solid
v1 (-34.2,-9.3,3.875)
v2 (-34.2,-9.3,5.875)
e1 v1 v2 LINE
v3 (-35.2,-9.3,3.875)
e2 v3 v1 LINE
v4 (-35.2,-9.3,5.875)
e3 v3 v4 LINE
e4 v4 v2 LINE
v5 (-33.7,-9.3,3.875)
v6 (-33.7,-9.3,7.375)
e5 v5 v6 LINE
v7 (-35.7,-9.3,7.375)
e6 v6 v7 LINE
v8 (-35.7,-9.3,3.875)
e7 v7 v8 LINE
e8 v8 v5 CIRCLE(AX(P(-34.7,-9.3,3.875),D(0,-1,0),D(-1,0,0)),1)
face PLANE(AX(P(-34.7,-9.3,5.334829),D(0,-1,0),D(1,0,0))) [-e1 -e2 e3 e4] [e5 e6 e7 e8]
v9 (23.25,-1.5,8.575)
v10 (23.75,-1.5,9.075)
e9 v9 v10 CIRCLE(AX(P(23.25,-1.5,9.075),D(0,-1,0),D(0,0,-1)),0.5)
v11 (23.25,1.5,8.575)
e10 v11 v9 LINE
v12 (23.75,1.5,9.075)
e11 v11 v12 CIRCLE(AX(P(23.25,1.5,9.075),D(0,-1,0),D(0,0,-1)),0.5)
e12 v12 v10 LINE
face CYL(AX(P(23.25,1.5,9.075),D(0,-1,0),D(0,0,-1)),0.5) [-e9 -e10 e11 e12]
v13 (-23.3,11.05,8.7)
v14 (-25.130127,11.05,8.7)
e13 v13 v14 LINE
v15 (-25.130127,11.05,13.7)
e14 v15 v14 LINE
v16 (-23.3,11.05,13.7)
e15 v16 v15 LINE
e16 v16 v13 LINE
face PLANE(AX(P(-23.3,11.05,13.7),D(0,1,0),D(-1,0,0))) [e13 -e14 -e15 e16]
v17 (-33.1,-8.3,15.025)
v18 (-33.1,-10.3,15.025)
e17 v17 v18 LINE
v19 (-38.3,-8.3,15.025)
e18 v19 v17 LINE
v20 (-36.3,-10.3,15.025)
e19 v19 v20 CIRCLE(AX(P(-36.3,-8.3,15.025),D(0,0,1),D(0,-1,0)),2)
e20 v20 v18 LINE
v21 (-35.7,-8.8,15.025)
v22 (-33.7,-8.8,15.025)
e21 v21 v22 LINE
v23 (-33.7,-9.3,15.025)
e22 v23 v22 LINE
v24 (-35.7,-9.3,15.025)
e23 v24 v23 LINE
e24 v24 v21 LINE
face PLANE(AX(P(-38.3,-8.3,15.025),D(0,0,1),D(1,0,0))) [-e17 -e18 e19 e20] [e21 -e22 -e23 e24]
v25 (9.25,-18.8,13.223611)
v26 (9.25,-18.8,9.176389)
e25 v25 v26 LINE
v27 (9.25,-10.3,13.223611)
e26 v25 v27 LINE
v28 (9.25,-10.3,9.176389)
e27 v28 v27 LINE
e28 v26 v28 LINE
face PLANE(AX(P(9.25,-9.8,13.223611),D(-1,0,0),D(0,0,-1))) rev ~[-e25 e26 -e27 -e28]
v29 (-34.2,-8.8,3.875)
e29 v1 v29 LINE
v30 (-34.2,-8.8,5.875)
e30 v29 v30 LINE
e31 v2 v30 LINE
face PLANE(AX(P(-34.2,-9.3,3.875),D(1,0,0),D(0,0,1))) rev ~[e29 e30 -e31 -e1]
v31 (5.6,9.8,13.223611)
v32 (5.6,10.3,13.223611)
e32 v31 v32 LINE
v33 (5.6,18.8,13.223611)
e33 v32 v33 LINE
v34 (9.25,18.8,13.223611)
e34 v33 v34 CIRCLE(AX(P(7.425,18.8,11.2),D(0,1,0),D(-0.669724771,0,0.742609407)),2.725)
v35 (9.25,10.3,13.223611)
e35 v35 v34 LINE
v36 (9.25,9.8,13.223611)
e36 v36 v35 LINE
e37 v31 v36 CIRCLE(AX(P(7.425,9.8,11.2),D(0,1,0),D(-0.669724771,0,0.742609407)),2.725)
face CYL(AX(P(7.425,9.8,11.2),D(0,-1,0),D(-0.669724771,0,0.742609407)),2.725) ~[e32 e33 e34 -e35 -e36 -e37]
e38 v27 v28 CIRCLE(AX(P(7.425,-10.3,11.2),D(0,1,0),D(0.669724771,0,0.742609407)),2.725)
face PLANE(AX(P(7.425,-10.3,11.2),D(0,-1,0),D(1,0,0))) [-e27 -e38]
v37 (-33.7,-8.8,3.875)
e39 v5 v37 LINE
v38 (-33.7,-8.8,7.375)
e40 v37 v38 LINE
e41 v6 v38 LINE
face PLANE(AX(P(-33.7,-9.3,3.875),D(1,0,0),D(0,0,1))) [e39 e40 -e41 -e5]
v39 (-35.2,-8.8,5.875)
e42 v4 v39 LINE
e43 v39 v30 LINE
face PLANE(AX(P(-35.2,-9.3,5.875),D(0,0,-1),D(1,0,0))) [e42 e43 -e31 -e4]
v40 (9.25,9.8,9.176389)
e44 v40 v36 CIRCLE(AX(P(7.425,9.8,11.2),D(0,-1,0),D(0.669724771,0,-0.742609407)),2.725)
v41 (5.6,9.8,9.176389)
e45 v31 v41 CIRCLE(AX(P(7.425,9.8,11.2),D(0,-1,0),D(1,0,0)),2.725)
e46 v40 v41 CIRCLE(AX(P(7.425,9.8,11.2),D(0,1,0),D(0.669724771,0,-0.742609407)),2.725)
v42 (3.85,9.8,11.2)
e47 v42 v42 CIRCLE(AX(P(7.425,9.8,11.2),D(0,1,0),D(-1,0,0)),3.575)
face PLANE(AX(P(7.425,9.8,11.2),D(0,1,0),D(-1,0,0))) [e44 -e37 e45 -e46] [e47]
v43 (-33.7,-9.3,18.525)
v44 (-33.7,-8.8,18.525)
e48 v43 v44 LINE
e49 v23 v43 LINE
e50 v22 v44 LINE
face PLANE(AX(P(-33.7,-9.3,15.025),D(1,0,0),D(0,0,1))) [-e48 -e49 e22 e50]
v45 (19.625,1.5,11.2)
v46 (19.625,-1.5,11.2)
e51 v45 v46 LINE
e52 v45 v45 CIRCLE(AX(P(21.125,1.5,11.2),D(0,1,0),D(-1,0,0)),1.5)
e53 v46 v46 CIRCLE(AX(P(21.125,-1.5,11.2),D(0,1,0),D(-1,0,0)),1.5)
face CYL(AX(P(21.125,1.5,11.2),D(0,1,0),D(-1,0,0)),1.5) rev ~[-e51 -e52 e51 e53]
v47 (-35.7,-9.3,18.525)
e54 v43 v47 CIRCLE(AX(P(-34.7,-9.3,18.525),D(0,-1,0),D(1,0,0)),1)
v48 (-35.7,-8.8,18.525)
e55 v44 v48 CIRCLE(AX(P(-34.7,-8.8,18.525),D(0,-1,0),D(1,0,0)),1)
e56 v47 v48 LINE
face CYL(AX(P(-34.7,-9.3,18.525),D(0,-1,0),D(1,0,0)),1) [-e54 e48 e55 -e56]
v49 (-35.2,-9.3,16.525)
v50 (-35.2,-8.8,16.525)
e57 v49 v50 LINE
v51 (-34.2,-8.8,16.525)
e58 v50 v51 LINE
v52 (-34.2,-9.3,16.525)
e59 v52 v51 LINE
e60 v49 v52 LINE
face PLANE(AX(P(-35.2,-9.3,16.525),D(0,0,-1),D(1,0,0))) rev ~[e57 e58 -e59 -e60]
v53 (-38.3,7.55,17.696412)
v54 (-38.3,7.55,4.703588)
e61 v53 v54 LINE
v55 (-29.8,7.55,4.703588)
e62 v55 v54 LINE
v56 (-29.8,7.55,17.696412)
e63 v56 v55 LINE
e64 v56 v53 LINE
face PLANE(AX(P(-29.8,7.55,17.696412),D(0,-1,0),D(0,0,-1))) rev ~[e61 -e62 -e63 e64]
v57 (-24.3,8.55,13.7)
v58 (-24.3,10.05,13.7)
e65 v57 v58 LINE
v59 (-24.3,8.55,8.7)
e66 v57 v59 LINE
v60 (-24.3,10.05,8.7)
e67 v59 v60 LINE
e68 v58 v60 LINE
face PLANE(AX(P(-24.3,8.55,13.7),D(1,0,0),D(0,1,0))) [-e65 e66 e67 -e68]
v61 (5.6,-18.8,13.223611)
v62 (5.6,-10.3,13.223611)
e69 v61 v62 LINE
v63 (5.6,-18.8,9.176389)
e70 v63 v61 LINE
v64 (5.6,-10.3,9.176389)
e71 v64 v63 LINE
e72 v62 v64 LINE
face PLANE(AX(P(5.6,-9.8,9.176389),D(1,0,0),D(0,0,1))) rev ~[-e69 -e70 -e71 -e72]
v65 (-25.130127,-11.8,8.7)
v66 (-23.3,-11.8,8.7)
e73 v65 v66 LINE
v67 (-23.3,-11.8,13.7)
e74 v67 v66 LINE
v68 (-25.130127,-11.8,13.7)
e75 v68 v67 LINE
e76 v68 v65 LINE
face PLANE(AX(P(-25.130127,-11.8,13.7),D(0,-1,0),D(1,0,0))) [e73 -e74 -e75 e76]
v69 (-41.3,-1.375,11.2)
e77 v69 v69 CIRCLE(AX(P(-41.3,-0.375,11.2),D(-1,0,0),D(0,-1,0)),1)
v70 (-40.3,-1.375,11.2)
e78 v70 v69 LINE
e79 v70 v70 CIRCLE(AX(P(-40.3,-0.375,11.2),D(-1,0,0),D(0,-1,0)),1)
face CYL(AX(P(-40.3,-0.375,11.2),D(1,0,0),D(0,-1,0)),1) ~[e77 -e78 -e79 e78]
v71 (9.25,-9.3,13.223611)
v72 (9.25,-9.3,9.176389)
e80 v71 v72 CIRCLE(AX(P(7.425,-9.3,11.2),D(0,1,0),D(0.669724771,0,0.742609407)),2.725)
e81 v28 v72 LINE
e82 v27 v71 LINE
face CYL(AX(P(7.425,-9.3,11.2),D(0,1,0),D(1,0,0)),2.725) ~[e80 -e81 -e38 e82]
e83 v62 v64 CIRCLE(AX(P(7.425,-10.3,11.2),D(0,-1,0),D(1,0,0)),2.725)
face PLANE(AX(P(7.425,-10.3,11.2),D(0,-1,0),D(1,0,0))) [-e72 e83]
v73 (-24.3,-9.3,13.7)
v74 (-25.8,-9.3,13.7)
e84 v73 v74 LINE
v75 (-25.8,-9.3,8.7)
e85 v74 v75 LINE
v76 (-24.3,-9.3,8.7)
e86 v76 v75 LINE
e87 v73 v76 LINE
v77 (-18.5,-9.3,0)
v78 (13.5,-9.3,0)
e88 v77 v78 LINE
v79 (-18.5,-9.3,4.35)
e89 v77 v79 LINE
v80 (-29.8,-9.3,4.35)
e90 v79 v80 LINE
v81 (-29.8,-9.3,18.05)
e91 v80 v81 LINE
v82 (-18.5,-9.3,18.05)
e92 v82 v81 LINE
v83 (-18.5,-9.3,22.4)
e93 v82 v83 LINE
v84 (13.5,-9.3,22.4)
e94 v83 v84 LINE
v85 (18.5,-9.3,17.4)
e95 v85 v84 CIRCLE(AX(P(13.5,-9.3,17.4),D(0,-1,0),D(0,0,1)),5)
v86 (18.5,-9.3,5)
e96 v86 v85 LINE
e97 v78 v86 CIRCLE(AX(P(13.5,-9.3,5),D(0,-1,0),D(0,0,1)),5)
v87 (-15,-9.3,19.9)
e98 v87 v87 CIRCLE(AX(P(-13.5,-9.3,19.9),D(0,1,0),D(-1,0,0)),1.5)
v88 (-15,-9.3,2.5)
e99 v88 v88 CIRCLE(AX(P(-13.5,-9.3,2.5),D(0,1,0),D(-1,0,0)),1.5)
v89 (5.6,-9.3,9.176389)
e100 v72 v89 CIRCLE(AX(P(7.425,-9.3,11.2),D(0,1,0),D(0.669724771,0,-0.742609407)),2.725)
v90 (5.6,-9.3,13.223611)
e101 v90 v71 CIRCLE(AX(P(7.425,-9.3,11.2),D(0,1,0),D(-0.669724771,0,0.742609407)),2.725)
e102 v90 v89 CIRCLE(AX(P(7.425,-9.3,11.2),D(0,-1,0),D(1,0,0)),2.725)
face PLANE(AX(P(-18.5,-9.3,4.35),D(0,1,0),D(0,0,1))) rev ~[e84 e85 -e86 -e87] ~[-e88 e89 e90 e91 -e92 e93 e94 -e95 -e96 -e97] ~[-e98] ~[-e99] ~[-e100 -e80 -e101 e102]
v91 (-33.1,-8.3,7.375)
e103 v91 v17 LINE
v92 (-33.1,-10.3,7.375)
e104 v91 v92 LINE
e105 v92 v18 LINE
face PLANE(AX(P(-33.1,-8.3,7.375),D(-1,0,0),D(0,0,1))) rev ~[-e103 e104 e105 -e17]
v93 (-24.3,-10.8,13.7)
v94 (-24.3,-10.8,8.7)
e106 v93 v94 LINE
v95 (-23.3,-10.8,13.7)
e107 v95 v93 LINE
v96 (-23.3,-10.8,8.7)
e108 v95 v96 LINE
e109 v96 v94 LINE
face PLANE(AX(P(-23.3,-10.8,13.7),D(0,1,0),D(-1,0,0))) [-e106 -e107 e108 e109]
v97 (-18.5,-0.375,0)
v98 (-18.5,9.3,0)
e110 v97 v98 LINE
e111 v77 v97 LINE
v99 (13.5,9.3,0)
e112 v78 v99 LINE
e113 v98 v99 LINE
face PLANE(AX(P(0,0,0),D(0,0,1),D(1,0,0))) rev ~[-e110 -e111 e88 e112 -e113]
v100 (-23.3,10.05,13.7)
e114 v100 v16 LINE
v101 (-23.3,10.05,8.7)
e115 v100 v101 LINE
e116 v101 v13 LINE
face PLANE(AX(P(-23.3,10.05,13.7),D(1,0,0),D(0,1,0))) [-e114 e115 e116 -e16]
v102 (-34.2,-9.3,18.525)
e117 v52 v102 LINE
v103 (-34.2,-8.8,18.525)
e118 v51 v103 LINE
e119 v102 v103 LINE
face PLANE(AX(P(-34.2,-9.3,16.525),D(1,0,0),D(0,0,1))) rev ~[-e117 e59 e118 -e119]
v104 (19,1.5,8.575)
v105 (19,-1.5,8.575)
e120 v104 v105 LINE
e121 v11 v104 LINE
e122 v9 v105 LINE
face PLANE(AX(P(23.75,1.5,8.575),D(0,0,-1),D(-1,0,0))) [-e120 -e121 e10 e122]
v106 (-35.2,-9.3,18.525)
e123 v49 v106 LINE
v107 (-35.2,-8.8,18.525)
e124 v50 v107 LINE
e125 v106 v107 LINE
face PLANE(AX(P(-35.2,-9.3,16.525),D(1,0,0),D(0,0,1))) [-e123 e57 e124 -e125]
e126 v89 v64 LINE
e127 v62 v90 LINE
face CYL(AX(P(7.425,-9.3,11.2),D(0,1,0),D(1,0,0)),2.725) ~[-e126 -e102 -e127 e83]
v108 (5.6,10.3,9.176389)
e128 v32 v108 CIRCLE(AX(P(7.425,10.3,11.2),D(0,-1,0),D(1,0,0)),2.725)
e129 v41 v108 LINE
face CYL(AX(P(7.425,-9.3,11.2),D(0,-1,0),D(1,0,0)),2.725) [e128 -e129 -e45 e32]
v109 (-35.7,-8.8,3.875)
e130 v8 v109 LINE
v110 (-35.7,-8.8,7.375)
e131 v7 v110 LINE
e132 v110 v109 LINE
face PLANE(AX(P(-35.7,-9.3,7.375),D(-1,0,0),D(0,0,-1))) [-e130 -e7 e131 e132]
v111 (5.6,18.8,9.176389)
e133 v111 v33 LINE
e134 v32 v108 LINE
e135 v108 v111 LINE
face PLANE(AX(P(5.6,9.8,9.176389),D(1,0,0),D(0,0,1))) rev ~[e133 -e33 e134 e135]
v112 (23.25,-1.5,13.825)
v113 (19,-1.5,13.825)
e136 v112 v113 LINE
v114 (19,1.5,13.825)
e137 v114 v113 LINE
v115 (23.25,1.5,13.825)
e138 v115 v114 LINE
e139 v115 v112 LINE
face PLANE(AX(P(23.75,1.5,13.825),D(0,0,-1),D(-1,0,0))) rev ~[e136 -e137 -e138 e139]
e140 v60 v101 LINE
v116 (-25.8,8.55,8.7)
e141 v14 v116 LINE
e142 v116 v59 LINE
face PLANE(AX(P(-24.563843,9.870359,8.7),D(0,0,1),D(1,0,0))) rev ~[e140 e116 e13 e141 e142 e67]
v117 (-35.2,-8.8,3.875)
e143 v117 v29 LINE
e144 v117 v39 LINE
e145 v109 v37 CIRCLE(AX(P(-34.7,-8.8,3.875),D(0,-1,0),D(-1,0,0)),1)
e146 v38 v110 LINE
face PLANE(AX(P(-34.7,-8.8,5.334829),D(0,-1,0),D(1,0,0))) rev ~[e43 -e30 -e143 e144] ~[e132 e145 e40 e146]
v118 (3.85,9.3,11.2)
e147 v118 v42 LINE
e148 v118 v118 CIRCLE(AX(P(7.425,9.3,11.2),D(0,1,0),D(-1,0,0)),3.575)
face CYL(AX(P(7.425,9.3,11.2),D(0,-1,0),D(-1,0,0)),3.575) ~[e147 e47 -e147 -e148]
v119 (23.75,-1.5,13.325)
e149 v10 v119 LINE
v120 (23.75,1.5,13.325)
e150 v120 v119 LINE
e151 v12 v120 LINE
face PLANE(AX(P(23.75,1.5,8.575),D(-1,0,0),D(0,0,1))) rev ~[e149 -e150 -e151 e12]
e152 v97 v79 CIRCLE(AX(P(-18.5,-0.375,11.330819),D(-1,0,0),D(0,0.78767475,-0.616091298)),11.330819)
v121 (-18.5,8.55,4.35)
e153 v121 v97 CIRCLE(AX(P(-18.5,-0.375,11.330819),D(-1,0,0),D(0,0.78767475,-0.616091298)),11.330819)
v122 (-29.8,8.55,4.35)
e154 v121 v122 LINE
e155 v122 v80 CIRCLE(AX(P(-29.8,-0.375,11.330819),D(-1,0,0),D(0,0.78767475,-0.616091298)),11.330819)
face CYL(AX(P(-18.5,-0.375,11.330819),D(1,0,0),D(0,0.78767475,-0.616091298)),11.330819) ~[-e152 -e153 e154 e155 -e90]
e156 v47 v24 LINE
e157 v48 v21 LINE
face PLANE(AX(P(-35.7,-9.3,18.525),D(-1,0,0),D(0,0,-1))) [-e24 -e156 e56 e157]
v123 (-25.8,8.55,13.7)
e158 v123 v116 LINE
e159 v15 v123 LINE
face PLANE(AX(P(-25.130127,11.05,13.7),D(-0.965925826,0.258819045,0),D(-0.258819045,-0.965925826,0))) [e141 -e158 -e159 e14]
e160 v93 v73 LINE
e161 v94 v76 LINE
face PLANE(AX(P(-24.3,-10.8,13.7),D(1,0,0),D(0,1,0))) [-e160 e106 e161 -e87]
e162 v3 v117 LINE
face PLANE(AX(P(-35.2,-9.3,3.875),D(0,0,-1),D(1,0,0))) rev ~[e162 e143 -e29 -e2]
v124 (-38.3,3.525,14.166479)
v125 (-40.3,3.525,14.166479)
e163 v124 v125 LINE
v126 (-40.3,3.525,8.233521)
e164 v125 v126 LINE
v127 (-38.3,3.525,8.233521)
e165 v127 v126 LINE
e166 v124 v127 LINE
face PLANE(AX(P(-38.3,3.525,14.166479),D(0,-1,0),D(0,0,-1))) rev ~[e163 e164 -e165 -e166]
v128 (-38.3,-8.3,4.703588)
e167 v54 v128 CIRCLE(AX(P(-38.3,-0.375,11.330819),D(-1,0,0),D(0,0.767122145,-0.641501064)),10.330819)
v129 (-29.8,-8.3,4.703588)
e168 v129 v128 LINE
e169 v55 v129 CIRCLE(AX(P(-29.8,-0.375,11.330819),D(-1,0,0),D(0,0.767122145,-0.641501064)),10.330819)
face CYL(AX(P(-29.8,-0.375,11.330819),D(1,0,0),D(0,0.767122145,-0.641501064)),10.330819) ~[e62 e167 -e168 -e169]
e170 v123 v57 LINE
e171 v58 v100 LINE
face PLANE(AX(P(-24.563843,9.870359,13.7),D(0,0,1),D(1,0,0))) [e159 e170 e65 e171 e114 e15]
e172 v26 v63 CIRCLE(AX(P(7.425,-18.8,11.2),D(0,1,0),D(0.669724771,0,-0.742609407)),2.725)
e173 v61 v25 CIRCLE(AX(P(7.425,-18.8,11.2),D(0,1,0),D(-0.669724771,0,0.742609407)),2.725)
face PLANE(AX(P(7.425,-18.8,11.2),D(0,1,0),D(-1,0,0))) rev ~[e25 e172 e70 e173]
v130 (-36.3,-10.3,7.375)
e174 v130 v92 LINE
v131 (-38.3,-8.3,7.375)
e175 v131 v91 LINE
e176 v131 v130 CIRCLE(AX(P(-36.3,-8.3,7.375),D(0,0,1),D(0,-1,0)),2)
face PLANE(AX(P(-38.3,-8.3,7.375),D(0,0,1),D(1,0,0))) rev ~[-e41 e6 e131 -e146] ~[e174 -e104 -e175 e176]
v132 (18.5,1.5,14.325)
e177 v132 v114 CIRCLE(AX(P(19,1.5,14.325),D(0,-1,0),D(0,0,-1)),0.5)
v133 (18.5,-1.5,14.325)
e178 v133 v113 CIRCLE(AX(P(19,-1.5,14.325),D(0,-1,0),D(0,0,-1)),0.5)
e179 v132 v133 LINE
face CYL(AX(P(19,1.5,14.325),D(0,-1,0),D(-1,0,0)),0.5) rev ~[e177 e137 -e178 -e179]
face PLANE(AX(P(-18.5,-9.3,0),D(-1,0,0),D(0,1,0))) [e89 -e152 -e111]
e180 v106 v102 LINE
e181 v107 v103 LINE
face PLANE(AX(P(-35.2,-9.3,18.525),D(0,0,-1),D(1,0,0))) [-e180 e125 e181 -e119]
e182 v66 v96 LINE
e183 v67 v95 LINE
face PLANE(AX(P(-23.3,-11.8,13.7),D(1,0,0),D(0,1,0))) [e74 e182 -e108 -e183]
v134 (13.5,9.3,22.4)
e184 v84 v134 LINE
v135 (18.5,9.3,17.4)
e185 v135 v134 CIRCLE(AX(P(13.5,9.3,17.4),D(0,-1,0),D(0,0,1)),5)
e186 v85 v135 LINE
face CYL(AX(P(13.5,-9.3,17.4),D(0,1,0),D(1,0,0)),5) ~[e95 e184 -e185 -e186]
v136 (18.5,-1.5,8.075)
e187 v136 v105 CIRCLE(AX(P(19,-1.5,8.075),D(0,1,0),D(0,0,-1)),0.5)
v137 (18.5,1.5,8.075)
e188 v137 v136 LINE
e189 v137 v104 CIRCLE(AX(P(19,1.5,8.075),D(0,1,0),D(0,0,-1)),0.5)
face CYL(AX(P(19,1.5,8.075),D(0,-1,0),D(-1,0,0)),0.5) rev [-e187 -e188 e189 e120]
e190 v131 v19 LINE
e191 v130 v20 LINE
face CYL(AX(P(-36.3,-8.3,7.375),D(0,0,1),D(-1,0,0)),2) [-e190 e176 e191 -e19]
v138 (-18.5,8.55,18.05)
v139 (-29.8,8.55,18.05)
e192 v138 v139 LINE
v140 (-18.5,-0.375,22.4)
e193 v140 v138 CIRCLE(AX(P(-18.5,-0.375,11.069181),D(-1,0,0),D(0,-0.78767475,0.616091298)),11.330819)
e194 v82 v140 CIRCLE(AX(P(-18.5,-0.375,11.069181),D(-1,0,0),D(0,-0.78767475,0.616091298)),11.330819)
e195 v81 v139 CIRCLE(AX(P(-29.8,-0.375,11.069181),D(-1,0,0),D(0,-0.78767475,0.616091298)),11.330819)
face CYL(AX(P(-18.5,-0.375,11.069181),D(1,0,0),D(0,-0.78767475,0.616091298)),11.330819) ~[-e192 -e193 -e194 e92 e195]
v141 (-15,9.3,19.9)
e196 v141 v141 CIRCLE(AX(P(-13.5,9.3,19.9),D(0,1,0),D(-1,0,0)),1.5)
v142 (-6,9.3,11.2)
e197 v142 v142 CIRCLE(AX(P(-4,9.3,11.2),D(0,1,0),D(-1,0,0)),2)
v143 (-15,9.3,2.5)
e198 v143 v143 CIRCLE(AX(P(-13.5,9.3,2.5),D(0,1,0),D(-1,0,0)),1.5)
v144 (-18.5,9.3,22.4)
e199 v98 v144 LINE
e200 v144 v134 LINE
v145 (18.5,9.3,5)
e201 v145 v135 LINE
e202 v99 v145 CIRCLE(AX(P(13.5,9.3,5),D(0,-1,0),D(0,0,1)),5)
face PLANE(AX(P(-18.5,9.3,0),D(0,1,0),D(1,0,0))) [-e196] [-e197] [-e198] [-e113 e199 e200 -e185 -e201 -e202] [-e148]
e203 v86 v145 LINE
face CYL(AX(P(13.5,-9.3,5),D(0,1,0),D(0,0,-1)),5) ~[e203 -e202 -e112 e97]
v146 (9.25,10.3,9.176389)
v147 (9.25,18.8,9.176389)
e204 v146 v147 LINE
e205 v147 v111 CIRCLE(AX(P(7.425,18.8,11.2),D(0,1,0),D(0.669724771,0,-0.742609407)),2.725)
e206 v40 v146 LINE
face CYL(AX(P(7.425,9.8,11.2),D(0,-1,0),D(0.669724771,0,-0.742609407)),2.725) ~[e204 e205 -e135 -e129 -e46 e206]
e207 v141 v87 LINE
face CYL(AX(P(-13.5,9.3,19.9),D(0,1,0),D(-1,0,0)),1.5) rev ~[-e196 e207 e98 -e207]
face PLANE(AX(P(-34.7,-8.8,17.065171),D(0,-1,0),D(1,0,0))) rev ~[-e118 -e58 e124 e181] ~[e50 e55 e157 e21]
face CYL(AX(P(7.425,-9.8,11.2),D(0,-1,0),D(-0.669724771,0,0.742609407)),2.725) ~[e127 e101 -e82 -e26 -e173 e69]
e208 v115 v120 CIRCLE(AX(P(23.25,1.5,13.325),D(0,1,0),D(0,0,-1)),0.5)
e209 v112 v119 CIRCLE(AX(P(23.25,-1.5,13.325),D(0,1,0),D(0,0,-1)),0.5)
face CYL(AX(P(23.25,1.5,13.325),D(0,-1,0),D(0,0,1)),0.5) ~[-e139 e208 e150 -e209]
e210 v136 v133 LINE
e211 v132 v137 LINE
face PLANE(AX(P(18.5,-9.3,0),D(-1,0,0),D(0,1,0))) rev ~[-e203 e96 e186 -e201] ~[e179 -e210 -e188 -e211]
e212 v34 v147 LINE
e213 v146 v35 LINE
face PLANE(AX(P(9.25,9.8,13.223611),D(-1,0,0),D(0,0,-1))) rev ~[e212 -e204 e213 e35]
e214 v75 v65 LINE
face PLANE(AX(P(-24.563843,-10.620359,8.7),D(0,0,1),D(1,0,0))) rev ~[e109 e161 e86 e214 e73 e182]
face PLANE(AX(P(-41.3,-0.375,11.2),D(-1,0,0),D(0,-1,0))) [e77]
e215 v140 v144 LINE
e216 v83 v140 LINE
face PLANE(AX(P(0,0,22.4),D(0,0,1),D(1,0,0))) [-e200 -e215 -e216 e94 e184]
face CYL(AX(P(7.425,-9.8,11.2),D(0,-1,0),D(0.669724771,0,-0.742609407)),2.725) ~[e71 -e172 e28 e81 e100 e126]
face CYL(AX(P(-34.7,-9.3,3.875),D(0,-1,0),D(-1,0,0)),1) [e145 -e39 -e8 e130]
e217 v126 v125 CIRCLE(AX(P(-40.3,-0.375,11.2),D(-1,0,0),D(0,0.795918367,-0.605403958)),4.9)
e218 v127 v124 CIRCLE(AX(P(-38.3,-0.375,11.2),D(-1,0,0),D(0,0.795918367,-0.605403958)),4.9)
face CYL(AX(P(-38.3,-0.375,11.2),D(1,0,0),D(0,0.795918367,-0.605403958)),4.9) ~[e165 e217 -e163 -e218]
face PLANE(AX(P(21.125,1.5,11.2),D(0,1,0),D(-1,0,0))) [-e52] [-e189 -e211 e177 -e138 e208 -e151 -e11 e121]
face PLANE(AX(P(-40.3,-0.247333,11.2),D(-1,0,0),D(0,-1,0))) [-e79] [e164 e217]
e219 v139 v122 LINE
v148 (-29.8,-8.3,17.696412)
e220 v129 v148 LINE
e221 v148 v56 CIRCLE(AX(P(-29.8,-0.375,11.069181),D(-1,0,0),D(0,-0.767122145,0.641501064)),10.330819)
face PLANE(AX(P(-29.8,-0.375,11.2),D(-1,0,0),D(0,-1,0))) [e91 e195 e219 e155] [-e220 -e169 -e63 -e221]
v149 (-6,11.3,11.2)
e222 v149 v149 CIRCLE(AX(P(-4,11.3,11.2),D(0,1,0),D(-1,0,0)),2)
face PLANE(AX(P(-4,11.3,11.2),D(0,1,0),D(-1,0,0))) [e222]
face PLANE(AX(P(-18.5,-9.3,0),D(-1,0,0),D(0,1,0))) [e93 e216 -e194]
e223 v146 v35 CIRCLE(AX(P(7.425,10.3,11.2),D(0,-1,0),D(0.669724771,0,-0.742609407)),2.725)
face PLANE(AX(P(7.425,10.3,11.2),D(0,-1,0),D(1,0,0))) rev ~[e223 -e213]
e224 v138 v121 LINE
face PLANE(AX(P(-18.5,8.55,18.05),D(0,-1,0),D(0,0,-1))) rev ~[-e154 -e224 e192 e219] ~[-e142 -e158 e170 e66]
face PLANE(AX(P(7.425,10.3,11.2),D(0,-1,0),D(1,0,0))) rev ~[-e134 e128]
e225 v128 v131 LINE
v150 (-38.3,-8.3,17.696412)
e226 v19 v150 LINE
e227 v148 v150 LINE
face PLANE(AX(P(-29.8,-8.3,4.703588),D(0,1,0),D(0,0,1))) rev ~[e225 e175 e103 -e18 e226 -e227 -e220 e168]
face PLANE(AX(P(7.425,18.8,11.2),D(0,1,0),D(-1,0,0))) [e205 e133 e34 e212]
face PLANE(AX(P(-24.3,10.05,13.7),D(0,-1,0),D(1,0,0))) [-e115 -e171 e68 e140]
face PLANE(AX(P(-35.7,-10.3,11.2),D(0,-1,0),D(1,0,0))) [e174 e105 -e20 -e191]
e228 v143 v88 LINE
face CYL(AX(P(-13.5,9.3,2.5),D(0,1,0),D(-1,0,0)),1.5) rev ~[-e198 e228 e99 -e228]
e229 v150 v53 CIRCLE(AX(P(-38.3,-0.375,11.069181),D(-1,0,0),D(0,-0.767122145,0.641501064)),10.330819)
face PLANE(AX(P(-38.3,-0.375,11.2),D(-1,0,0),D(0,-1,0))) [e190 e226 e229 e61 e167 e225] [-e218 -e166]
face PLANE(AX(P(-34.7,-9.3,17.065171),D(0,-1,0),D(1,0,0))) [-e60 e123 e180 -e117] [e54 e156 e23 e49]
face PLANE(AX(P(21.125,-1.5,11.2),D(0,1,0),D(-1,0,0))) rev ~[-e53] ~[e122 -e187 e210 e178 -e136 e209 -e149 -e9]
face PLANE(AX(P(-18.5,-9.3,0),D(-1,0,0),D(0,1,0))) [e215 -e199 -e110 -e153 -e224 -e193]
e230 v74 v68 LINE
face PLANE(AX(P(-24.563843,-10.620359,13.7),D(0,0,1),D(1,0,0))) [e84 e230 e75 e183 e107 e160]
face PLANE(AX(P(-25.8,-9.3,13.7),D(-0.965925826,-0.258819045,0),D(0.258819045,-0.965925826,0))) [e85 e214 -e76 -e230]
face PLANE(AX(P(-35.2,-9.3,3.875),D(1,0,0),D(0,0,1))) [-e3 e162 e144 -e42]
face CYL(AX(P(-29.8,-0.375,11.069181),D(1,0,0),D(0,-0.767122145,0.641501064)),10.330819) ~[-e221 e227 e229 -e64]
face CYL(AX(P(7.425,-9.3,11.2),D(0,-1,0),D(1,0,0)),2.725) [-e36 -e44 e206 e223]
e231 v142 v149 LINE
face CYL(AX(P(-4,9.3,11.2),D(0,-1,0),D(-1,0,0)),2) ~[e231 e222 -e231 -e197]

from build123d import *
from build123d import SkipClean  # not in build123d's __all__

# Parameters (mm, degrees)
F0_W           = 37
F0_H           = 18.6
F1_DEPTH       = 22.4
F3_DEPTH       = 11.3
F5_DEPTH       = 8.5
F7_DEPTH       = 2
F8_R           = 1
F9_DEPTH       = 1
F10_R          = 3.575
F11_DEPTH      = 0.5
F11_DEPTH_BACK = 19.1
F13_DEPTH      = 9
F13_DEPTH_BACK = 28.6
F14_R          = 5
F16_START      = -7.8
F15_W          = 5.25
F15_H          = 5.25
F15_R          = 1.5
F16_DEPTH      = 3
F17_R          = 0.5
F19_START      = -8.7
F19_DEPTH      = 5
F20_R          = 2
F21_DEPTH      = 2
F22_R          = 1.5
F23_DEPTH      = 28.101
F24_DEPTH      = 0.5
F25_R          = 2.725
F26_DEPTH      = 1
F26_DEPTH_BACK = 19.6
F27_W          = 5.2
F27_H          = 7.65
F28_DEPTH      = 2
F29_R          = 2
F31_START      = -1
F30_W          = 1
F30_H          = 2
F31_DEPTH      = 0.5


# Not quite as in the source:
# - after a boolean that leaves OpenCascade's solid faulty, fix() repairs it


with BuildPart() as f1:
    # F0 (on Top) → F1 (new body)
    with BuildSketch(Plane.XY):
        Rectangle(F0_W, F0_H)
    extrude(amount=F1_DEPTH)

    # F2 (on face) → F3 (join)
    with BuildSketch(Plane(origin=(-18.5, 0, 0), x_dir=(0, -1, 0), z_dir=(-1, 0, 0))):
        with BuildLine():
            ThreePointArc((-8.55, 4.35), (0.375, 0), (9.3, 4.35))
            Line((9.3, 4.35), (9.3, 18.05))
            ThreePointArc((9.3, 18.05), (0.375, 22.4), (-8.55, 18.05))
            Line((-8.55, 18.05), (-8.55, 4.35))
        make_face()
    extrude(amount=F3_DEPTH)

    # F4 (on face) → F5 (join)
    with BuildSketch(Plane(origin=(-29.8, 0, 0), x_dir=(0, -1, 0), z_dir=(-1, 0, 0))):
        with BuildLine():
            Line((-7.55, 17.6964123944), (-7.55, 4.7035876056))
            ThreePointArc((-7.55, 4.7035876056), (0.375, 1), (8.3, 4.7035876056))
            Line((8.3, 4.7035876056), (8.3, 17.6964123944))
            ThreePointArc((8.3, 17.6964123944), (0.375, 21.4), (-7.55, 17.6964123944))
        make_face()
    extrude(amount=F5_DEPTH)

    # F6 (on face) → F7 (join)
    with BuildSketch(Plane(origin=(-38.3, 0, 0), x_dir=(0, -1, 0), z_dir=(-1, 0, 0))):
        with BuildLine():
            Line((-3.525, 14.1664793948), (-3.525, 8.2335206052))
            ThreePointArc((-3.525, 8.2335206052), (5.275, 11.2), (-3.525, 14.1664793948))
        make_face()
    extrude(amount=F7_DEPTH)

    # F8 (on face) → F9 (join)
    with BuildSketch(Plane(origin=(-40.3, 0, 0), x_dir=(0, -1, 0), z_dir=(-1, 0, 0))):
        with Locations((0.375, 11.2)):
            Circle(F8_R)
    extrude(amount=F9_DEPTH)

    # F10 (on face) → F11 (join, two sides)
    with BuildSketch(Plane(origin=(0, 9.3, 0), x_dir=(-1, 0, 0), z_dir=(0, 1, 0))) as f11_sk:
        with Locations((-7.425, 11.2)):
            Circle(F10_R)
    extrude(amount=F11_DEPTH)
    extrude(f11_sk.sketch, amount=-F11_DEPTH_BACK)

    # F12 (on face) → F13 (join, two sides)
    with BuildSketch(Plane(origin=(0, 9.8, 0), x_dir=(-1, 0, 0), z_dir=(0, 1, 0))) as f13_sk:
        with BuildLine():
            Line((-5.6, 9.1763893655), (-5.6, 13.2236106345))
            ThreePointArc((-5.6, 13.2236106345), (-7.425, 13.925), (-9.25, 13.2236106345))
            Line((-9.25, 13.2236106345), (-9.25, 9.1763893655))
            ThreePointArc((-9.25, 9.1763893655), (-7.425, 8.475), (-5.6, 9.1763893655))
        make_face()
    extrude(amount=F13_DEPTH)
    extrude(f13_sk.sketch, amount=-F13_DEPTH_BACK)

    # F14
    f14_edges = [f1.edges().sort_by_distance(p)[0] for p in [
        (18.5, 0, 0),
        (18.5, 0, 22.4),
    ]]
    fillet(f14_edges, radius=F14_R)

    # F15 (on face) → F16 (join)
    with BuildSketch(Plane(origin=(0, 9.3, 0), x_dir=(-1, 0, 0), z_dir=(0, 1, 0)).offset(F16_START)):
        with Locations((-21.125, 11.2)):
            Rectangle(F15_W, F15_H)
        with Locations((-21.125, 11.2)):
            Circle(F15_R, mode=Mode.SUBTRACT)
    extrude(amount=-F16_DEPTH)

    # F17
    f17_edges = [f1.edges().sort_by_distance(p)[0] for p in [
        (23.75, 0, 13.825),
        (18.5, 0, 13.825),
        (23.75, 0, 8.575),
        (18.5, 0, 8.575),
    ]]
    fillet(f17_edges, radius=F17_R)

    # F18 (on face) → F19 (join)
    with BuildSketch(Plane.XY.offset(22.4).offset(F19_START)):
        Polygon((-25.1301270189, 11.05), (-25.8, 8.55), (-24.3, 8.55), (-24.3, 10.05), (-23.3, 10.05), (-23.3, 11.05), align=None)
        Polygon((-23.3, -10.8), (-24.3, -10.8), (-24.3, -9.3), (-25.8, -9.3), (-25.1301270189, -11.8), (-23.3, -11.8), align=None)
    extrude(amount=-F19_DEPTH)

    # F20 (on face) → F21 (join)
    with BuildSketch(Plane(origin=(0, 9.3, 0), x_dir=(-1, 0, 0), z_dir=(0, 1, 0))):
        with Locations((4, 11.2)):
            Circle(F20_R)
    extrude(amount=F21_DEPTH)

    # F22 (on face) → F23 (cut, through all)
    with BuildSketch(Plane(origin=(0, 9.3, 0), x_dir=(-1, 0, 0), z_dir=(0, 1, 0))):
        with Locations((13.5, 19.9)):
            Circle(F22_R)
        with Locations((13.5, 2.5)):
            Circle(F22_R)
    extrude(amount=-F23_DEPTH, mode=Mode.SUBTRACT)

    # F24 (cut): a face of the model
    f24_faces = [f1.faces().sort_by_distance(p)[0] for p in [
        (10.8988837303, -9.8, 11.2),
    ]]
    extrude(f24_faces, amount=-F24_DEPTH, mode=Mode.SUBTRACT)

    # F25 (on face) → F26 (join, two sides)
    with BuildSketch(Plane.XZ.offset(9.3)) as f26_sk:
        with Locations((7.425, 11.2)):
            Circle(F25_R)
    with SkipClean():  # cleaning this boolean's faces spoils the solid; the shape is the same uncleaned
        extrude(amount=F26_DEPTH)
        extrude(f26_sk.sketch, amount=-F26_DEPTH_BACK)

    # F27 (on face) → F28 (join)
    with BuildSketch(Plane.XZ.offset(8.3)):
        with Locations((-35.7, 11.2)):
            Rectangle(F27_W, F27_H)
    extrude(amount=F28_DEPTH)

    add(f1.part.fix(), mode=Mode.REPLACE)

    # F29
    f29_edges = [f1.edges().sort_by_distance(p)[0] for p in [
        (-38.3, -10.3, 11.2),
    ]]
    fillet(f29_edges, radius=F29_R)

    # F30 (on face) → F31 (join)
    with BuildSketch(Plane.XZ.offset(10.3).offset(F31_START)):
        with BuildLine():
            Line((-35.7, 18.525), (-35.7, 15.025))
            Line((-35.7, 15.025), (-33.7, 15.025))
            Line((-33.7, 15.025), (-33.7, 18.525))
            ThreePointArc((-33.7, 18.525), (-34.7, 19.525), (-35.7, 18.525))
        make_face()
        with Locations((-34.7, 17.525)):
            Rectangle(F30_W, F30_H, mode=Mode.SUBTRACT)
        with BuildLine():
            Line((-35.7, 7.375), (-35.7, 3.875))
            ThreePointArc((-35.7, 3.875), (-34.7, 2.875), (-33.7, 3.875))
            Line((-33.7, 3.875), (-33.7, 7.375))
            Line((-33.7, 7.375), (-35.7, 7.375))
        make_face()
        with Locations((-34.7, 4.875)):
            Rectangle(F30_W, F30_H, mode=Mode.SUBTRACT)
    extrude(amount=-F31_DEPTH)


solid = f1.part
